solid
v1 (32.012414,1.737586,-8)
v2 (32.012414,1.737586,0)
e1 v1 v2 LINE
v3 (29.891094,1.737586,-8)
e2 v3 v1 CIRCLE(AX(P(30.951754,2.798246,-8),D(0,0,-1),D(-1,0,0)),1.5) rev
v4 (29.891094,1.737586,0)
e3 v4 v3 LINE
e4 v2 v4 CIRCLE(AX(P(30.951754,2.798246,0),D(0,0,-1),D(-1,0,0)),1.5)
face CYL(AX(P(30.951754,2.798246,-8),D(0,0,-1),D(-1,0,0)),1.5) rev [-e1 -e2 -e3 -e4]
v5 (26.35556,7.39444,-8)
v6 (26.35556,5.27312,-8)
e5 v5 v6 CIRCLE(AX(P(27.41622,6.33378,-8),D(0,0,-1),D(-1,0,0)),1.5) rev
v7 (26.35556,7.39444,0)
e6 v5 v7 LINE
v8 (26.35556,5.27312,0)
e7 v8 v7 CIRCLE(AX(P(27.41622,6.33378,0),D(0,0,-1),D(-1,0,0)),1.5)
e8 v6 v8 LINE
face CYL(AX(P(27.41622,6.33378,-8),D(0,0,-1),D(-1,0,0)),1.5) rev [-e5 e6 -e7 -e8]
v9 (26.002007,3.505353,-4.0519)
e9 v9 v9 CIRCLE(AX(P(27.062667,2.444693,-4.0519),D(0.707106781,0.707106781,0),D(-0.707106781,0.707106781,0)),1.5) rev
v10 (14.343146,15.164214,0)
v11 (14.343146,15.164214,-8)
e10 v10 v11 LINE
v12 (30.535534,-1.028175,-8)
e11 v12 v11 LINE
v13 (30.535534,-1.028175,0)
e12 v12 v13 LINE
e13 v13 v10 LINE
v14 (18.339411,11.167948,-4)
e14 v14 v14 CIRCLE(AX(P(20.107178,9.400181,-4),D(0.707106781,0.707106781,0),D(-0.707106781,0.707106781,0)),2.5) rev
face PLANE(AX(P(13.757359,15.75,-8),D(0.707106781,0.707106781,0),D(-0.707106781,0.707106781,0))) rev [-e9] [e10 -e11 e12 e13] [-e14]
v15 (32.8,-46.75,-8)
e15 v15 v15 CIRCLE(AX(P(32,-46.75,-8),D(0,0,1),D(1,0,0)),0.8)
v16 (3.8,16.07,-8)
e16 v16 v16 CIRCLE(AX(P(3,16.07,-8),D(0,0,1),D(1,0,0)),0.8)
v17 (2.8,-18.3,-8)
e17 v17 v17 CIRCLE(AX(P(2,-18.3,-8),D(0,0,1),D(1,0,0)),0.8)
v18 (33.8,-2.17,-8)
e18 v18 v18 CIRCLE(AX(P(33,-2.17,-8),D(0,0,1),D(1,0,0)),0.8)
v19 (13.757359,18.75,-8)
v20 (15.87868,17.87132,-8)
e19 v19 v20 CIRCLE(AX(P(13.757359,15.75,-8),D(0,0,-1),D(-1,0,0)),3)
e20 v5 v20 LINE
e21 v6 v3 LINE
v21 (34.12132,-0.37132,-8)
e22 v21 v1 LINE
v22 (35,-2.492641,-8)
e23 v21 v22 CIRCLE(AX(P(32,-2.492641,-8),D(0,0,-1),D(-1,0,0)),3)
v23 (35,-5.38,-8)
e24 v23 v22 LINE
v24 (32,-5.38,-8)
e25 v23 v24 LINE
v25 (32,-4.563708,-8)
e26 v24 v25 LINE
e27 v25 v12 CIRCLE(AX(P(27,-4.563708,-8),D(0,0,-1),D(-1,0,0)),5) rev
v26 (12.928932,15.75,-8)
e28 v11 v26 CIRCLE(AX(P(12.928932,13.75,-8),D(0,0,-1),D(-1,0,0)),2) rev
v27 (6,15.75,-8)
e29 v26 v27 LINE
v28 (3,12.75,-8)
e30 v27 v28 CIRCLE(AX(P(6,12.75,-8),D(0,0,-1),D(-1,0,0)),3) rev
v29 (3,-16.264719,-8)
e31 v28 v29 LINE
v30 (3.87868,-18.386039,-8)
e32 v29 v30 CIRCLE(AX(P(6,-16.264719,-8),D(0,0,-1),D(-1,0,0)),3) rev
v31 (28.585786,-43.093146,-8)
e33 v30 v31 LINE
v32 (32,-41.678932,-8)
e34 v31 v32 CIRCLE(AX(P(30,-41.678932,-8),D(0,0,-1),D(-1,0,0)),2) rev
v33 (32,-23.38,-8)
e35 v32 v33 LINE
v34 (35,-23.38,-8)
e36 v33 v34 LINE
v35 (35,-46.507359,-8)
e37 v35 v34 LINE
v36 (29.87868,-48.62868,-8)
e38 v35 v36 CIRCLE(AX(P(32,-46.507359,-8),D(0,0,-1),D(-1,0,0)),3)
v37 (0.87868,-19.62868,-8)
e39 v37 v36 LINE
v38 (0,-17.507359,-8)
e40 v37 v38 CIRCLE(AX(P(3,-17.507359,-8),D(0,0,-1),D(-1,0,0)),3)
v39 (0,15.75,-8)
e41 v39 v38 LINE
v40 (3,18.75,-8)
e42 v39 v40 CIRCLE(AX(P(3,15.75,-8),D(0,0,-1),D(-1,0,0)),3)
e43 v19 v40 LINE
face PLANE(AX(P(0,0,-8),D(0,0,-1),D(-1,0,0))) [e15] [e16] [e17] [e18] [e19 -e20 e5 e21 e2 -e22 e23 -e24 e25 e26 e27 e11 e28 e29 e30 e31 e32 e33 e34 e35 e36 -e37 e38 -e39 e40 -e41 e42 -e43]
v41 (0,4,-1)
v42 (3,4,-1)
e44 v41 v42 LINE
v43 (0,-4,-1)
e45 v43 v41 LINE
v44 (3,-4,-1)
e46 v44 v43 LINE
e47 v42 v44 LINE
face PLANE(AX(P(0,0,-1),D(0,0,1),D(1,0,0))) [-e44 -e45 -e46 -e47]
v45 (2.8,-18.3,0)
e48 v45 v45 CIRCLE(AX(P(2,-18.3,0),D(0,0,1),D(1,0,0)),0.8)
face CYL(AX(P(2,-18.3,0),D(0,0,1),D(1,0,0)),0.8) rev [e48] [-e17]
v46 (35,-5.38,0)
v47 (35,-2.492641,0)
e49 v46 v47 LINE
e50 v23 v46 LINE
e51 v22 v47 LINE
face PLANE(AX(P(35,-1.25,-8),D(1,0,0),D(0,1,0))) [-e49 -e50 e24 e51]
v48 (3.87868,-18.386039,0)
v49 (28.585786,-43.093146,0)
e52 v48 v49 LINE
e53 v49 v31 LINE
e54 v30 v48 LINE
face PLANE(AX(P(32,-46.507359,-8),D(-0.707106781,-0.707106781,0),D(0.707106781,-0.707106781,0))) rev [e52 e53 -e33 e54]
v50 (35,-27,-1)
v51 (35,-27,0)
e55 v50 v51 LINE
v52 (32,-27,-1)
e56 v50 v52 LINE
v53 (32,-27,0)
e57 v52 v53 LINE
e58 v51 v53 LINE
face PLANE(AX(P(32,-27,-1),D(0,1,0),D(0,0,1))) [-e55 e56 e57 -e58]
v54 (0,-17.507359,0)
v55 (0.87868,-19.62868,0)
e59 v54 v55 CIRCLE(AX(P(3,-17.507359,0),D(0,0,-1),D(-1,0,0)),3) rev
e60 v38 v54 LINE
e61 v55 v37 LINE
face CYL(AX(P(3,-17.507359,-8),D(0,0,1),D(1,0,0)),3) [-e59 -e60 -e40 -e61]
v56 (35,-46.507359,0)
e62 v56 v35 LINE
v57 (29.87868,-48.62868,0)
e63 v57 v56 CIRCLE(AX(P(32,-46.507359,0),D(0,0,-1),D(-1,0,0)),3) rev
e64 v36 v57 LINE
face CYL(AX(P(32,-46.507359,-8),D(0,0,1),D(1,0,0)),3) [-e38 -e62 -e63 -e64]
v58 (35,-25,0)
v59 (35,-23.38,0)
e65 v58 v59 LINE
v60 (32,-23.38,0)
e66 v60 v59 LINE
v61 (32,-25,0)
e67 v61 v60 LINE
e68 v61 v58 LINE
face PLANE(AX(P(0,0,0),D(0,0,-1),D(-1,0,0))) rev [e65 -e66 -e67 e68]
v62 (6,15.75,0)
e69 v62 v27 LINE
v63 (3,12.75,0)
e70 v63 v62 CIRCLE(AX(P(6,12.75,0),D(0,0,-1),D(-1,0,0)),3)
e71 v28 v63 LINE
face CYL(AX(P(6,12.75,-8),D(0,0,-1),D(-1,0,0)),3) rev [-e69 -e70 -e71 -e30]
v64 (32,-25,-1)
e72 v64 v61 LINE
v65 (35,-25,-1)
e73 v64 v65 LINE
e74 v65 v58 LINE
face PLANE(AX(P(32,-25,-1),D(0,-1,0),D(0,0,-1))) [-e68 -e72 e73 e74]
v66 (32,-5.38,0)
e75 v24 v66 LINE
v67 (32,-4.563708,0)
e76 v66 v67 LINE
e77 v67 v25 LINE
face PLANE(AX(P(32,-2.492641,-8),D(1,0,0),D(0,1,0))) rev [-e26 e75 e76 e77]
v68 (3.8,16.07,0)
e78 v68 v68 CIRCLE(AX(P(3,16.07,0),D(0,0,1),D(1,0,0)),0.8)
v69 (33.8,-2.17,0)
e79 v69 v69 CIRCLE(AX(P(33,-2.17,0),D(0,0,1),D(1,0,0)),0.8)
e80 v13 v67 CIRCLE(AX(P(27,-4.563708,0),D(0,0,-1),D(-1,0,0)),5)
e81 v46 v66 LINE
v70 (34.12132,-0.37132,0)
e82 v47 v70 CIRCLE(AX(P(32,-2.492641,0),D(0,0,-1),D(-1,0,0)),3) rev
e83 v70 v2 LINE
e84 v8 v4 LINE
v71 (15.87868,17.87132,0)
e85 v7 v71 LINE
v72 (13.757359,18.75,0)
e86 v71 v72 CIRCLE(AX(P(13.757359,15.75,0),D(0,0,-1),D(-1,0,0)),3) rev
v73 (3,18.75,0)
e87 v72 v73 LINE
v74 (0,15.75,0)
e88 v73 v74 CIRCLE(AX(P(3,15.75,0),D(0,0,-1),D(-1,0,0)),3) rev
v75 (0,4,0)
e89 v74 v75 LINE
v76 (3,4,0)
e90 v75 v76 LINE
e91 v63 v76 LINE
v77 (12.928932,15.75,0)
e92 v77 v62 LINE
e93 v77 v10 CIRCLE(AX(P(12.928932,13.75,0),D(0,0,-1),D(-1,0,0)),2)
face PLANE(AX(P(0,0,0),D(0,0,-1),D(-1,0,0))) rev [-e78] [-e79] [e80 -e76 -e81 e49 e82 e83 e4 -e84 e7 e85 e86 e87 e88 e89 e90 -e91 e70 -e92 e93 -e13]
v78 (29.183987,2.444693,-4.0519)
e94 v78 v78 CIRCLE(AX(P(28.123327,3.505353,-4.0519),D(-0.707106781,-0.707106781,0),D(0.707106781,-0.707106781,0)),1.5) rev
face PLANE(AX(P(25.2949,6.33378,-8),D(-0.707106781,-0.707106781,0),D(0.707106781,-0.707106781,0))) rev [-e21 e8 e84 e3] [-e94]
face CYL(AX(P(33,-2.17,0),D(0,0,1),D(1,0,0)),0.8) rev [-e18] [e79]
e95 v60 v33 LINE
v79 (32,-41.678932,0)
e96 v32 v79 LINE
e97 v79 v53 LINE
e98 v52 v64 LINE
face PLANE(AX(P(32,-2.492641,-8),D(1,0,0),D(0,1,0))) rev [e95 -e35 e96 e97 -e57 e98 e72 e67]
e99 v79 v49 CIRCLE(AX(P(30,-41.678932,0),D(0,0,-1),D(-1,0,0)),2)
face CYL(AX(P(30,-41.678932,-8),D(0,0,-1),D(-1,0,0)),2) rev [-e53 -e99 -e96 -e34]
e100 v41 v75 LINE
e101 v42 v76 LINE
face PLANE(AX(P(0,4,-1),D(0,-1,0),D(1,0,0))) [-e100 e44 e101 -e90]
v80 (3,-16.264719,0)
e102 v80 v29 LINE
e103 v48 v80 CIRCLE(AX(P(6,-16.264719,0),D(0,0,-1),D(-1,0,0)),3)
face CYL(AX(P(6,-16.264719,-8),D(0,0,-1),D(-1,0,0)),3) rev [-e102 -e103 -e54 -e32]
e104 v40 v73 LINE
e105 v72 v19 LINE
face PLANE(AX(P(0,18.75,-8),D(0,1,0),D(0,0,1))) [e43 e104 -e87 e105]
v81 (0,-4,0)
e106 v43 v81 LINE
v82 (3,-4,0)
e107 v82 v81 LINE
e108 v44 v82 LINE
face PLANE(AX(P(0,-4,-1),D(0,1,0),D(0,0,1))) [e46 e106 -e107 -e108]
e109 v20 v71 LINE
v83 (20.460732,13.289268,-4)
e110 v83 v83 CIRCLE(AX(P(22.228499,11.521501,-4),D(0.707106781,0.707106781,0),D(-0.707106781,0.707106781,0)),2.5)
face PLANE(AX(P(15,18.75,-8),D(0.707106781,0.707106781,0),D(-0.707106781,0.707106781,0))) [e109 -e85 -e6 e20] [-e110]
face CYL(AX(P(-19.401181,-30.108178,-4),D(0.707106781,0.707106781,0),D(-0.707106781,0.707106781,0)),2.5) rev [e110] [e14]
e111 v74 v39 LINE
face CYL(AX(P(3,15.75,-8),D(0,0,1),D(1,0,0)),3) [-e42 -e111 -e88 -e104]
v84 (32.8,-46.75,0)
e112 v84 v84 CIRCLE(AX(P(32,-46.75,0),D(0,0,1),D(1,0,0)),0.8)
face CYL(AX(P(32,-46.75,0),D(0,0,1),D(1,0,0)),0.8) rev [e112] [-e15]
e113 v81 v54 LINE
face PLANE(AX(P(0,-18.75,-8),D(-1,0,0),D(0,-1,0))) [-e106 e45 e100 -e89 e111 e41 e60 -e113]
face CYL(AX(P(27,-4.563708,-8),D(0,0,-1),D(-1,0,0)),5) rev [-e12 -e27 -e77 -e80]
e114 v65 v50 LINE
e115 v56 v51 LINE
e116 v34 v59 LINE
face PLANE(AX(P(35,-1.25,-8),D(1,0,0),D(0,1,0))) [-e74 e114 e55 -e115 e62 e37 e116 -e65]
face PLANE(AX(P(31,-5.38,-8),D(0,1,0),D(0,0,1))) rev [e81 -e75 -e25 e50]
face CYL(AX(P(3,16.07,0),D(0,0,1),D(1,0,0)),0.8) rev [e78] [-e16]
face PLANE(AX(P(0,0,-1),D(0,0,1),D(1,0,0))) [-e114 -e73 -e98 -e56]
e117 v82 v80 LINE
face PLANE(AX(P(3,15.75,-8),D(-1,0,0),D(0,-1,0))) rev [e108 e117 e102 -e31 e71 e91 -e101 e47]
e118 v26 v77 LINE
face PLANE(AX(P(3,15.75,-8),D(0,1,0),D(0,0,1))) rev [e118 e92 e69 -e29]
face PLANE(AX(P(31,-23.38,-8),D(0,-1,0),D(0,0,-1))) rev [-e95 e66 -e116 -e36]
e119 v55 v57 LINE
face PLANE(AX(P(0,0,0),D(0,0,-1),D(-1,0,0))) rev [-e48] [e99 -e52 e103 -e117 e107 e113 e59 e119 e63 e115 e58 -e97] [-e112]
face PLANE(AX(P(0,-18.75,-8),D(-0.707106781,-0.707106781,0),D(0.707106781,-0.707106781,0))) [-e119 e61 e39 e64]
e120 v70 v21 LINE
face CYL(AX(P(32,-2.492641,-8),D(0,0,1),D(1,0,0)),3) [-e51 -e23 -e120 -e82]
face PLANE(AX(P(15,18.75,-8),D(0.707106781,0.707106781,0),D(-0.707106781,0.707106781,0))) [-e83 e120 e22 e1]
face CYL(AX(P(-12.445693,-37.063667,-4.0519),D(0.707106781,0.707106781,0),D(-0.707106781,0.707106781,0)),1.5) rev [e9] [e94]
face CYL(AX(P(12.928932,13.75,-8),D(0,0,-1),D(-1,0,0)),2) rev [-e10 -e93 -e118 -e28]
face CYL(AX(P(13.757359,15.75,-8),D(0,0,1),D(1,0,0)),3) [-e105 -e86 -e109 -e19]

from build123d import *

# Parameters (mm, degrees)
EXTRUDE_1079_DEPTH     = 8
FILLET_4_R             = 3
FILLET_5_R             = 2
SKETCH_13_W            = 3
SKETCH_13_H            = 8
SKETCH_13_H_2          = 2
CUT_EXTRUDE_2700_DEPTH = 1
HOLE_WIZARD_M2_D       = 1.6
FILLET_6_R             = 3
FILLET_7_R             = 5
SKETCH_19_W            = 4
SKETCH_19_H            = 18
CUT_EXTRUDE_4512_DEPTH = 62.155364655
CUT_EXTRUDE_1_REACH    = 71.276
SKETCH_20_R            = 2.5
SKETCH_20_R_2          = 1.5
CUT_EXTRUDE_2_DEPTH    = 62.155364655
FILLET_8_R             = 1.5


with BuildPart() as part:
    # Эскиз8 → Extrude 1079 (new body)
    with BuildSketch(Plane.XY):
        Polygon((0, -18.75), (0, 18.75), (15, 18.75), (35, -1.25), (35, -53.75), align=None)
        Polygon((32, -46.507359313), (3, -17.507359313), (3, 15.75), (13.757359313, 15.75), (32, -2.492640687), align=None, mode=Mode.SUBTRACT)
    extrude(amount=-EXTRUDE_1079_DEPTH)

    # Скругление4
    fillet_4_edges = [part.edges().sort_by_distance(p)[0] for p in [
        (3, -17.507359313, -4),
        (3, 15.75, -4),
        (15, 18.75, -4),
        (35, -1.25, -4),
        (0, -18.75, -4),
        (0, 18.75, -4),
    ]]
    fillet(fillet_4_edges, radius=FILLET_4_R)

    # Скругление5
    fillet_5_edges = [part.edges().sort_by_distance(p)[0] for p in [
        (13.757359313, 15.75, -4),
        (32, -46.507359313, -4),
    ]]
    fillet(fillet_5_edges, radius=FILLET_5_R)

    # Эскиз13 → Cut-Extrude 2700 (cut)
    with BuildSketch(Plane(origin=(0, 0, 0), x_dir=(-1, 0, 0), z_dir=(0, 0, -1))):
        with Locations((-1.5, 0)):
            Rectangle(SKETCH_13_W, SKETCH_13_H)
        with Locations((-33.5, -26)):
            Rectangle(SKETCH_13_W, SKETCH_13_H_2)
    extrude(amount=CUT_EXTRUDE_2700_DEPTH, mode=Mode.SUBTRACT)

    # Крепление рамки M2 (through all)
    with Locations(Plane.XY):
        with Locations((2, -18.3), (3, 16.07), (32, -46.75), (33, -2.17)):
            Hole(HOLE_WIZARD_M2_D / 2)

    # Скругление6
    fillet_6_edges = [part.edges().sort_by_distance(p)[0] for p in [
        (35, -53.75, -4),
    ]]
    fillet(fillet_6_edges, radius=FILLET_6_R)

    # Скругление7
    fillet_7_edges = [part.edges().sort_by_distance(p)[0] for p in [
        (32, -2.492640687, -4),
    ]]
    fillet(fillet_7_edges, radius=FILLET_7_R)

    # Эскиз19 → Cut-Extrude 4512 (cut, through all)
    with BuildSketch(Plane.XY):
        with Locations((33, -14.38)):
            Rectangle(SKETCH_19_W, SKETCH_19_H)
    extrude(amount=-CUT_EXTRUDE_4512_DEPTH, mode=Mode.SUBTRACT)

    # Эскиз20 → Вырез-Вытянуть1 (cut, up to next)
    with BuildSketch(Plane(origin=(16.875, 16.875, 0), x_dir=(0, 0, -1), z_dir=(0.7071067811865488, 0.7071067811865462, 0)), mode=Mode.PRIVATE) as cut_extrude_1_sk1:
        with Locations(Location((4, -7.570990258, 0), (0, 0, 90))):
            Circle(SKETCH_20_R)
    cut_extrude_1_tool1 = extrude(cut_extrude_1_sk1.sketch, amount=-CUT_EXTRUDE_1_REACH, mode=Mode.PRIVATE) & part.part
    # Эскиз20 → Вырез-Вытянуть1 (cut, up to next)
    with BuildSketch(Plane(origin=(16.875, 16.875, 0), x_dir=(0, 0, -1), z_dir=(0.7071067811865488, 0.7071067811865462, 0)), mode=Mode.PRIVATE) as cut_extrude_1_sk2:
        with Locations(Location((4.0519, -17.407536383, 0), (0, 0, 90))):
            Circle(SKETCH_20_R_2)
    cut_extrude_1_tool2 = extrude(cut_extrude_1_sk2.sketch, amount=-CUT_EXTRUDE_1_REACH, mode=Mode.PRIVATE) & part.part
    add(cut_extrude_1_tool1.solids().sort_by_distance((22.228499, 11.521501, -4))[0], mode=Mode.SUBTRACT)
    add(cut_extrude_1_tool2.solids().sort_by_distance((29.183987, 4.566013, -4.0519))[0], mode=Mode.SUBTRACT)

    # Эскиз21 → Вырез-Вытянуть2 (cut, through all)
    with BuildSketch(Plane.XY):
        Polygon((26.355559895, 7.394440105), (25.294899724, 6.333779933), (30.951753973, 0.676925683), (32.012414145, 1.737585855), align=None)
    extrude(amount=-CUT_EXTRUDE_2_DEPTH, mode=Mode.SUBTRACT)

    # Скругление8
    fillet_8_edges = [part.edges().sort_by_distance(p)[0] for p in [
        (30.951753973, 0.676925683, -4),
        (25.294899724, 6.333779933, -4),
    ]]
    fillet(fillet_8_edges, radius=FILLET_8_R - 0.0001)  # a hair under: the kernel refuses the full size


solid = part.part
